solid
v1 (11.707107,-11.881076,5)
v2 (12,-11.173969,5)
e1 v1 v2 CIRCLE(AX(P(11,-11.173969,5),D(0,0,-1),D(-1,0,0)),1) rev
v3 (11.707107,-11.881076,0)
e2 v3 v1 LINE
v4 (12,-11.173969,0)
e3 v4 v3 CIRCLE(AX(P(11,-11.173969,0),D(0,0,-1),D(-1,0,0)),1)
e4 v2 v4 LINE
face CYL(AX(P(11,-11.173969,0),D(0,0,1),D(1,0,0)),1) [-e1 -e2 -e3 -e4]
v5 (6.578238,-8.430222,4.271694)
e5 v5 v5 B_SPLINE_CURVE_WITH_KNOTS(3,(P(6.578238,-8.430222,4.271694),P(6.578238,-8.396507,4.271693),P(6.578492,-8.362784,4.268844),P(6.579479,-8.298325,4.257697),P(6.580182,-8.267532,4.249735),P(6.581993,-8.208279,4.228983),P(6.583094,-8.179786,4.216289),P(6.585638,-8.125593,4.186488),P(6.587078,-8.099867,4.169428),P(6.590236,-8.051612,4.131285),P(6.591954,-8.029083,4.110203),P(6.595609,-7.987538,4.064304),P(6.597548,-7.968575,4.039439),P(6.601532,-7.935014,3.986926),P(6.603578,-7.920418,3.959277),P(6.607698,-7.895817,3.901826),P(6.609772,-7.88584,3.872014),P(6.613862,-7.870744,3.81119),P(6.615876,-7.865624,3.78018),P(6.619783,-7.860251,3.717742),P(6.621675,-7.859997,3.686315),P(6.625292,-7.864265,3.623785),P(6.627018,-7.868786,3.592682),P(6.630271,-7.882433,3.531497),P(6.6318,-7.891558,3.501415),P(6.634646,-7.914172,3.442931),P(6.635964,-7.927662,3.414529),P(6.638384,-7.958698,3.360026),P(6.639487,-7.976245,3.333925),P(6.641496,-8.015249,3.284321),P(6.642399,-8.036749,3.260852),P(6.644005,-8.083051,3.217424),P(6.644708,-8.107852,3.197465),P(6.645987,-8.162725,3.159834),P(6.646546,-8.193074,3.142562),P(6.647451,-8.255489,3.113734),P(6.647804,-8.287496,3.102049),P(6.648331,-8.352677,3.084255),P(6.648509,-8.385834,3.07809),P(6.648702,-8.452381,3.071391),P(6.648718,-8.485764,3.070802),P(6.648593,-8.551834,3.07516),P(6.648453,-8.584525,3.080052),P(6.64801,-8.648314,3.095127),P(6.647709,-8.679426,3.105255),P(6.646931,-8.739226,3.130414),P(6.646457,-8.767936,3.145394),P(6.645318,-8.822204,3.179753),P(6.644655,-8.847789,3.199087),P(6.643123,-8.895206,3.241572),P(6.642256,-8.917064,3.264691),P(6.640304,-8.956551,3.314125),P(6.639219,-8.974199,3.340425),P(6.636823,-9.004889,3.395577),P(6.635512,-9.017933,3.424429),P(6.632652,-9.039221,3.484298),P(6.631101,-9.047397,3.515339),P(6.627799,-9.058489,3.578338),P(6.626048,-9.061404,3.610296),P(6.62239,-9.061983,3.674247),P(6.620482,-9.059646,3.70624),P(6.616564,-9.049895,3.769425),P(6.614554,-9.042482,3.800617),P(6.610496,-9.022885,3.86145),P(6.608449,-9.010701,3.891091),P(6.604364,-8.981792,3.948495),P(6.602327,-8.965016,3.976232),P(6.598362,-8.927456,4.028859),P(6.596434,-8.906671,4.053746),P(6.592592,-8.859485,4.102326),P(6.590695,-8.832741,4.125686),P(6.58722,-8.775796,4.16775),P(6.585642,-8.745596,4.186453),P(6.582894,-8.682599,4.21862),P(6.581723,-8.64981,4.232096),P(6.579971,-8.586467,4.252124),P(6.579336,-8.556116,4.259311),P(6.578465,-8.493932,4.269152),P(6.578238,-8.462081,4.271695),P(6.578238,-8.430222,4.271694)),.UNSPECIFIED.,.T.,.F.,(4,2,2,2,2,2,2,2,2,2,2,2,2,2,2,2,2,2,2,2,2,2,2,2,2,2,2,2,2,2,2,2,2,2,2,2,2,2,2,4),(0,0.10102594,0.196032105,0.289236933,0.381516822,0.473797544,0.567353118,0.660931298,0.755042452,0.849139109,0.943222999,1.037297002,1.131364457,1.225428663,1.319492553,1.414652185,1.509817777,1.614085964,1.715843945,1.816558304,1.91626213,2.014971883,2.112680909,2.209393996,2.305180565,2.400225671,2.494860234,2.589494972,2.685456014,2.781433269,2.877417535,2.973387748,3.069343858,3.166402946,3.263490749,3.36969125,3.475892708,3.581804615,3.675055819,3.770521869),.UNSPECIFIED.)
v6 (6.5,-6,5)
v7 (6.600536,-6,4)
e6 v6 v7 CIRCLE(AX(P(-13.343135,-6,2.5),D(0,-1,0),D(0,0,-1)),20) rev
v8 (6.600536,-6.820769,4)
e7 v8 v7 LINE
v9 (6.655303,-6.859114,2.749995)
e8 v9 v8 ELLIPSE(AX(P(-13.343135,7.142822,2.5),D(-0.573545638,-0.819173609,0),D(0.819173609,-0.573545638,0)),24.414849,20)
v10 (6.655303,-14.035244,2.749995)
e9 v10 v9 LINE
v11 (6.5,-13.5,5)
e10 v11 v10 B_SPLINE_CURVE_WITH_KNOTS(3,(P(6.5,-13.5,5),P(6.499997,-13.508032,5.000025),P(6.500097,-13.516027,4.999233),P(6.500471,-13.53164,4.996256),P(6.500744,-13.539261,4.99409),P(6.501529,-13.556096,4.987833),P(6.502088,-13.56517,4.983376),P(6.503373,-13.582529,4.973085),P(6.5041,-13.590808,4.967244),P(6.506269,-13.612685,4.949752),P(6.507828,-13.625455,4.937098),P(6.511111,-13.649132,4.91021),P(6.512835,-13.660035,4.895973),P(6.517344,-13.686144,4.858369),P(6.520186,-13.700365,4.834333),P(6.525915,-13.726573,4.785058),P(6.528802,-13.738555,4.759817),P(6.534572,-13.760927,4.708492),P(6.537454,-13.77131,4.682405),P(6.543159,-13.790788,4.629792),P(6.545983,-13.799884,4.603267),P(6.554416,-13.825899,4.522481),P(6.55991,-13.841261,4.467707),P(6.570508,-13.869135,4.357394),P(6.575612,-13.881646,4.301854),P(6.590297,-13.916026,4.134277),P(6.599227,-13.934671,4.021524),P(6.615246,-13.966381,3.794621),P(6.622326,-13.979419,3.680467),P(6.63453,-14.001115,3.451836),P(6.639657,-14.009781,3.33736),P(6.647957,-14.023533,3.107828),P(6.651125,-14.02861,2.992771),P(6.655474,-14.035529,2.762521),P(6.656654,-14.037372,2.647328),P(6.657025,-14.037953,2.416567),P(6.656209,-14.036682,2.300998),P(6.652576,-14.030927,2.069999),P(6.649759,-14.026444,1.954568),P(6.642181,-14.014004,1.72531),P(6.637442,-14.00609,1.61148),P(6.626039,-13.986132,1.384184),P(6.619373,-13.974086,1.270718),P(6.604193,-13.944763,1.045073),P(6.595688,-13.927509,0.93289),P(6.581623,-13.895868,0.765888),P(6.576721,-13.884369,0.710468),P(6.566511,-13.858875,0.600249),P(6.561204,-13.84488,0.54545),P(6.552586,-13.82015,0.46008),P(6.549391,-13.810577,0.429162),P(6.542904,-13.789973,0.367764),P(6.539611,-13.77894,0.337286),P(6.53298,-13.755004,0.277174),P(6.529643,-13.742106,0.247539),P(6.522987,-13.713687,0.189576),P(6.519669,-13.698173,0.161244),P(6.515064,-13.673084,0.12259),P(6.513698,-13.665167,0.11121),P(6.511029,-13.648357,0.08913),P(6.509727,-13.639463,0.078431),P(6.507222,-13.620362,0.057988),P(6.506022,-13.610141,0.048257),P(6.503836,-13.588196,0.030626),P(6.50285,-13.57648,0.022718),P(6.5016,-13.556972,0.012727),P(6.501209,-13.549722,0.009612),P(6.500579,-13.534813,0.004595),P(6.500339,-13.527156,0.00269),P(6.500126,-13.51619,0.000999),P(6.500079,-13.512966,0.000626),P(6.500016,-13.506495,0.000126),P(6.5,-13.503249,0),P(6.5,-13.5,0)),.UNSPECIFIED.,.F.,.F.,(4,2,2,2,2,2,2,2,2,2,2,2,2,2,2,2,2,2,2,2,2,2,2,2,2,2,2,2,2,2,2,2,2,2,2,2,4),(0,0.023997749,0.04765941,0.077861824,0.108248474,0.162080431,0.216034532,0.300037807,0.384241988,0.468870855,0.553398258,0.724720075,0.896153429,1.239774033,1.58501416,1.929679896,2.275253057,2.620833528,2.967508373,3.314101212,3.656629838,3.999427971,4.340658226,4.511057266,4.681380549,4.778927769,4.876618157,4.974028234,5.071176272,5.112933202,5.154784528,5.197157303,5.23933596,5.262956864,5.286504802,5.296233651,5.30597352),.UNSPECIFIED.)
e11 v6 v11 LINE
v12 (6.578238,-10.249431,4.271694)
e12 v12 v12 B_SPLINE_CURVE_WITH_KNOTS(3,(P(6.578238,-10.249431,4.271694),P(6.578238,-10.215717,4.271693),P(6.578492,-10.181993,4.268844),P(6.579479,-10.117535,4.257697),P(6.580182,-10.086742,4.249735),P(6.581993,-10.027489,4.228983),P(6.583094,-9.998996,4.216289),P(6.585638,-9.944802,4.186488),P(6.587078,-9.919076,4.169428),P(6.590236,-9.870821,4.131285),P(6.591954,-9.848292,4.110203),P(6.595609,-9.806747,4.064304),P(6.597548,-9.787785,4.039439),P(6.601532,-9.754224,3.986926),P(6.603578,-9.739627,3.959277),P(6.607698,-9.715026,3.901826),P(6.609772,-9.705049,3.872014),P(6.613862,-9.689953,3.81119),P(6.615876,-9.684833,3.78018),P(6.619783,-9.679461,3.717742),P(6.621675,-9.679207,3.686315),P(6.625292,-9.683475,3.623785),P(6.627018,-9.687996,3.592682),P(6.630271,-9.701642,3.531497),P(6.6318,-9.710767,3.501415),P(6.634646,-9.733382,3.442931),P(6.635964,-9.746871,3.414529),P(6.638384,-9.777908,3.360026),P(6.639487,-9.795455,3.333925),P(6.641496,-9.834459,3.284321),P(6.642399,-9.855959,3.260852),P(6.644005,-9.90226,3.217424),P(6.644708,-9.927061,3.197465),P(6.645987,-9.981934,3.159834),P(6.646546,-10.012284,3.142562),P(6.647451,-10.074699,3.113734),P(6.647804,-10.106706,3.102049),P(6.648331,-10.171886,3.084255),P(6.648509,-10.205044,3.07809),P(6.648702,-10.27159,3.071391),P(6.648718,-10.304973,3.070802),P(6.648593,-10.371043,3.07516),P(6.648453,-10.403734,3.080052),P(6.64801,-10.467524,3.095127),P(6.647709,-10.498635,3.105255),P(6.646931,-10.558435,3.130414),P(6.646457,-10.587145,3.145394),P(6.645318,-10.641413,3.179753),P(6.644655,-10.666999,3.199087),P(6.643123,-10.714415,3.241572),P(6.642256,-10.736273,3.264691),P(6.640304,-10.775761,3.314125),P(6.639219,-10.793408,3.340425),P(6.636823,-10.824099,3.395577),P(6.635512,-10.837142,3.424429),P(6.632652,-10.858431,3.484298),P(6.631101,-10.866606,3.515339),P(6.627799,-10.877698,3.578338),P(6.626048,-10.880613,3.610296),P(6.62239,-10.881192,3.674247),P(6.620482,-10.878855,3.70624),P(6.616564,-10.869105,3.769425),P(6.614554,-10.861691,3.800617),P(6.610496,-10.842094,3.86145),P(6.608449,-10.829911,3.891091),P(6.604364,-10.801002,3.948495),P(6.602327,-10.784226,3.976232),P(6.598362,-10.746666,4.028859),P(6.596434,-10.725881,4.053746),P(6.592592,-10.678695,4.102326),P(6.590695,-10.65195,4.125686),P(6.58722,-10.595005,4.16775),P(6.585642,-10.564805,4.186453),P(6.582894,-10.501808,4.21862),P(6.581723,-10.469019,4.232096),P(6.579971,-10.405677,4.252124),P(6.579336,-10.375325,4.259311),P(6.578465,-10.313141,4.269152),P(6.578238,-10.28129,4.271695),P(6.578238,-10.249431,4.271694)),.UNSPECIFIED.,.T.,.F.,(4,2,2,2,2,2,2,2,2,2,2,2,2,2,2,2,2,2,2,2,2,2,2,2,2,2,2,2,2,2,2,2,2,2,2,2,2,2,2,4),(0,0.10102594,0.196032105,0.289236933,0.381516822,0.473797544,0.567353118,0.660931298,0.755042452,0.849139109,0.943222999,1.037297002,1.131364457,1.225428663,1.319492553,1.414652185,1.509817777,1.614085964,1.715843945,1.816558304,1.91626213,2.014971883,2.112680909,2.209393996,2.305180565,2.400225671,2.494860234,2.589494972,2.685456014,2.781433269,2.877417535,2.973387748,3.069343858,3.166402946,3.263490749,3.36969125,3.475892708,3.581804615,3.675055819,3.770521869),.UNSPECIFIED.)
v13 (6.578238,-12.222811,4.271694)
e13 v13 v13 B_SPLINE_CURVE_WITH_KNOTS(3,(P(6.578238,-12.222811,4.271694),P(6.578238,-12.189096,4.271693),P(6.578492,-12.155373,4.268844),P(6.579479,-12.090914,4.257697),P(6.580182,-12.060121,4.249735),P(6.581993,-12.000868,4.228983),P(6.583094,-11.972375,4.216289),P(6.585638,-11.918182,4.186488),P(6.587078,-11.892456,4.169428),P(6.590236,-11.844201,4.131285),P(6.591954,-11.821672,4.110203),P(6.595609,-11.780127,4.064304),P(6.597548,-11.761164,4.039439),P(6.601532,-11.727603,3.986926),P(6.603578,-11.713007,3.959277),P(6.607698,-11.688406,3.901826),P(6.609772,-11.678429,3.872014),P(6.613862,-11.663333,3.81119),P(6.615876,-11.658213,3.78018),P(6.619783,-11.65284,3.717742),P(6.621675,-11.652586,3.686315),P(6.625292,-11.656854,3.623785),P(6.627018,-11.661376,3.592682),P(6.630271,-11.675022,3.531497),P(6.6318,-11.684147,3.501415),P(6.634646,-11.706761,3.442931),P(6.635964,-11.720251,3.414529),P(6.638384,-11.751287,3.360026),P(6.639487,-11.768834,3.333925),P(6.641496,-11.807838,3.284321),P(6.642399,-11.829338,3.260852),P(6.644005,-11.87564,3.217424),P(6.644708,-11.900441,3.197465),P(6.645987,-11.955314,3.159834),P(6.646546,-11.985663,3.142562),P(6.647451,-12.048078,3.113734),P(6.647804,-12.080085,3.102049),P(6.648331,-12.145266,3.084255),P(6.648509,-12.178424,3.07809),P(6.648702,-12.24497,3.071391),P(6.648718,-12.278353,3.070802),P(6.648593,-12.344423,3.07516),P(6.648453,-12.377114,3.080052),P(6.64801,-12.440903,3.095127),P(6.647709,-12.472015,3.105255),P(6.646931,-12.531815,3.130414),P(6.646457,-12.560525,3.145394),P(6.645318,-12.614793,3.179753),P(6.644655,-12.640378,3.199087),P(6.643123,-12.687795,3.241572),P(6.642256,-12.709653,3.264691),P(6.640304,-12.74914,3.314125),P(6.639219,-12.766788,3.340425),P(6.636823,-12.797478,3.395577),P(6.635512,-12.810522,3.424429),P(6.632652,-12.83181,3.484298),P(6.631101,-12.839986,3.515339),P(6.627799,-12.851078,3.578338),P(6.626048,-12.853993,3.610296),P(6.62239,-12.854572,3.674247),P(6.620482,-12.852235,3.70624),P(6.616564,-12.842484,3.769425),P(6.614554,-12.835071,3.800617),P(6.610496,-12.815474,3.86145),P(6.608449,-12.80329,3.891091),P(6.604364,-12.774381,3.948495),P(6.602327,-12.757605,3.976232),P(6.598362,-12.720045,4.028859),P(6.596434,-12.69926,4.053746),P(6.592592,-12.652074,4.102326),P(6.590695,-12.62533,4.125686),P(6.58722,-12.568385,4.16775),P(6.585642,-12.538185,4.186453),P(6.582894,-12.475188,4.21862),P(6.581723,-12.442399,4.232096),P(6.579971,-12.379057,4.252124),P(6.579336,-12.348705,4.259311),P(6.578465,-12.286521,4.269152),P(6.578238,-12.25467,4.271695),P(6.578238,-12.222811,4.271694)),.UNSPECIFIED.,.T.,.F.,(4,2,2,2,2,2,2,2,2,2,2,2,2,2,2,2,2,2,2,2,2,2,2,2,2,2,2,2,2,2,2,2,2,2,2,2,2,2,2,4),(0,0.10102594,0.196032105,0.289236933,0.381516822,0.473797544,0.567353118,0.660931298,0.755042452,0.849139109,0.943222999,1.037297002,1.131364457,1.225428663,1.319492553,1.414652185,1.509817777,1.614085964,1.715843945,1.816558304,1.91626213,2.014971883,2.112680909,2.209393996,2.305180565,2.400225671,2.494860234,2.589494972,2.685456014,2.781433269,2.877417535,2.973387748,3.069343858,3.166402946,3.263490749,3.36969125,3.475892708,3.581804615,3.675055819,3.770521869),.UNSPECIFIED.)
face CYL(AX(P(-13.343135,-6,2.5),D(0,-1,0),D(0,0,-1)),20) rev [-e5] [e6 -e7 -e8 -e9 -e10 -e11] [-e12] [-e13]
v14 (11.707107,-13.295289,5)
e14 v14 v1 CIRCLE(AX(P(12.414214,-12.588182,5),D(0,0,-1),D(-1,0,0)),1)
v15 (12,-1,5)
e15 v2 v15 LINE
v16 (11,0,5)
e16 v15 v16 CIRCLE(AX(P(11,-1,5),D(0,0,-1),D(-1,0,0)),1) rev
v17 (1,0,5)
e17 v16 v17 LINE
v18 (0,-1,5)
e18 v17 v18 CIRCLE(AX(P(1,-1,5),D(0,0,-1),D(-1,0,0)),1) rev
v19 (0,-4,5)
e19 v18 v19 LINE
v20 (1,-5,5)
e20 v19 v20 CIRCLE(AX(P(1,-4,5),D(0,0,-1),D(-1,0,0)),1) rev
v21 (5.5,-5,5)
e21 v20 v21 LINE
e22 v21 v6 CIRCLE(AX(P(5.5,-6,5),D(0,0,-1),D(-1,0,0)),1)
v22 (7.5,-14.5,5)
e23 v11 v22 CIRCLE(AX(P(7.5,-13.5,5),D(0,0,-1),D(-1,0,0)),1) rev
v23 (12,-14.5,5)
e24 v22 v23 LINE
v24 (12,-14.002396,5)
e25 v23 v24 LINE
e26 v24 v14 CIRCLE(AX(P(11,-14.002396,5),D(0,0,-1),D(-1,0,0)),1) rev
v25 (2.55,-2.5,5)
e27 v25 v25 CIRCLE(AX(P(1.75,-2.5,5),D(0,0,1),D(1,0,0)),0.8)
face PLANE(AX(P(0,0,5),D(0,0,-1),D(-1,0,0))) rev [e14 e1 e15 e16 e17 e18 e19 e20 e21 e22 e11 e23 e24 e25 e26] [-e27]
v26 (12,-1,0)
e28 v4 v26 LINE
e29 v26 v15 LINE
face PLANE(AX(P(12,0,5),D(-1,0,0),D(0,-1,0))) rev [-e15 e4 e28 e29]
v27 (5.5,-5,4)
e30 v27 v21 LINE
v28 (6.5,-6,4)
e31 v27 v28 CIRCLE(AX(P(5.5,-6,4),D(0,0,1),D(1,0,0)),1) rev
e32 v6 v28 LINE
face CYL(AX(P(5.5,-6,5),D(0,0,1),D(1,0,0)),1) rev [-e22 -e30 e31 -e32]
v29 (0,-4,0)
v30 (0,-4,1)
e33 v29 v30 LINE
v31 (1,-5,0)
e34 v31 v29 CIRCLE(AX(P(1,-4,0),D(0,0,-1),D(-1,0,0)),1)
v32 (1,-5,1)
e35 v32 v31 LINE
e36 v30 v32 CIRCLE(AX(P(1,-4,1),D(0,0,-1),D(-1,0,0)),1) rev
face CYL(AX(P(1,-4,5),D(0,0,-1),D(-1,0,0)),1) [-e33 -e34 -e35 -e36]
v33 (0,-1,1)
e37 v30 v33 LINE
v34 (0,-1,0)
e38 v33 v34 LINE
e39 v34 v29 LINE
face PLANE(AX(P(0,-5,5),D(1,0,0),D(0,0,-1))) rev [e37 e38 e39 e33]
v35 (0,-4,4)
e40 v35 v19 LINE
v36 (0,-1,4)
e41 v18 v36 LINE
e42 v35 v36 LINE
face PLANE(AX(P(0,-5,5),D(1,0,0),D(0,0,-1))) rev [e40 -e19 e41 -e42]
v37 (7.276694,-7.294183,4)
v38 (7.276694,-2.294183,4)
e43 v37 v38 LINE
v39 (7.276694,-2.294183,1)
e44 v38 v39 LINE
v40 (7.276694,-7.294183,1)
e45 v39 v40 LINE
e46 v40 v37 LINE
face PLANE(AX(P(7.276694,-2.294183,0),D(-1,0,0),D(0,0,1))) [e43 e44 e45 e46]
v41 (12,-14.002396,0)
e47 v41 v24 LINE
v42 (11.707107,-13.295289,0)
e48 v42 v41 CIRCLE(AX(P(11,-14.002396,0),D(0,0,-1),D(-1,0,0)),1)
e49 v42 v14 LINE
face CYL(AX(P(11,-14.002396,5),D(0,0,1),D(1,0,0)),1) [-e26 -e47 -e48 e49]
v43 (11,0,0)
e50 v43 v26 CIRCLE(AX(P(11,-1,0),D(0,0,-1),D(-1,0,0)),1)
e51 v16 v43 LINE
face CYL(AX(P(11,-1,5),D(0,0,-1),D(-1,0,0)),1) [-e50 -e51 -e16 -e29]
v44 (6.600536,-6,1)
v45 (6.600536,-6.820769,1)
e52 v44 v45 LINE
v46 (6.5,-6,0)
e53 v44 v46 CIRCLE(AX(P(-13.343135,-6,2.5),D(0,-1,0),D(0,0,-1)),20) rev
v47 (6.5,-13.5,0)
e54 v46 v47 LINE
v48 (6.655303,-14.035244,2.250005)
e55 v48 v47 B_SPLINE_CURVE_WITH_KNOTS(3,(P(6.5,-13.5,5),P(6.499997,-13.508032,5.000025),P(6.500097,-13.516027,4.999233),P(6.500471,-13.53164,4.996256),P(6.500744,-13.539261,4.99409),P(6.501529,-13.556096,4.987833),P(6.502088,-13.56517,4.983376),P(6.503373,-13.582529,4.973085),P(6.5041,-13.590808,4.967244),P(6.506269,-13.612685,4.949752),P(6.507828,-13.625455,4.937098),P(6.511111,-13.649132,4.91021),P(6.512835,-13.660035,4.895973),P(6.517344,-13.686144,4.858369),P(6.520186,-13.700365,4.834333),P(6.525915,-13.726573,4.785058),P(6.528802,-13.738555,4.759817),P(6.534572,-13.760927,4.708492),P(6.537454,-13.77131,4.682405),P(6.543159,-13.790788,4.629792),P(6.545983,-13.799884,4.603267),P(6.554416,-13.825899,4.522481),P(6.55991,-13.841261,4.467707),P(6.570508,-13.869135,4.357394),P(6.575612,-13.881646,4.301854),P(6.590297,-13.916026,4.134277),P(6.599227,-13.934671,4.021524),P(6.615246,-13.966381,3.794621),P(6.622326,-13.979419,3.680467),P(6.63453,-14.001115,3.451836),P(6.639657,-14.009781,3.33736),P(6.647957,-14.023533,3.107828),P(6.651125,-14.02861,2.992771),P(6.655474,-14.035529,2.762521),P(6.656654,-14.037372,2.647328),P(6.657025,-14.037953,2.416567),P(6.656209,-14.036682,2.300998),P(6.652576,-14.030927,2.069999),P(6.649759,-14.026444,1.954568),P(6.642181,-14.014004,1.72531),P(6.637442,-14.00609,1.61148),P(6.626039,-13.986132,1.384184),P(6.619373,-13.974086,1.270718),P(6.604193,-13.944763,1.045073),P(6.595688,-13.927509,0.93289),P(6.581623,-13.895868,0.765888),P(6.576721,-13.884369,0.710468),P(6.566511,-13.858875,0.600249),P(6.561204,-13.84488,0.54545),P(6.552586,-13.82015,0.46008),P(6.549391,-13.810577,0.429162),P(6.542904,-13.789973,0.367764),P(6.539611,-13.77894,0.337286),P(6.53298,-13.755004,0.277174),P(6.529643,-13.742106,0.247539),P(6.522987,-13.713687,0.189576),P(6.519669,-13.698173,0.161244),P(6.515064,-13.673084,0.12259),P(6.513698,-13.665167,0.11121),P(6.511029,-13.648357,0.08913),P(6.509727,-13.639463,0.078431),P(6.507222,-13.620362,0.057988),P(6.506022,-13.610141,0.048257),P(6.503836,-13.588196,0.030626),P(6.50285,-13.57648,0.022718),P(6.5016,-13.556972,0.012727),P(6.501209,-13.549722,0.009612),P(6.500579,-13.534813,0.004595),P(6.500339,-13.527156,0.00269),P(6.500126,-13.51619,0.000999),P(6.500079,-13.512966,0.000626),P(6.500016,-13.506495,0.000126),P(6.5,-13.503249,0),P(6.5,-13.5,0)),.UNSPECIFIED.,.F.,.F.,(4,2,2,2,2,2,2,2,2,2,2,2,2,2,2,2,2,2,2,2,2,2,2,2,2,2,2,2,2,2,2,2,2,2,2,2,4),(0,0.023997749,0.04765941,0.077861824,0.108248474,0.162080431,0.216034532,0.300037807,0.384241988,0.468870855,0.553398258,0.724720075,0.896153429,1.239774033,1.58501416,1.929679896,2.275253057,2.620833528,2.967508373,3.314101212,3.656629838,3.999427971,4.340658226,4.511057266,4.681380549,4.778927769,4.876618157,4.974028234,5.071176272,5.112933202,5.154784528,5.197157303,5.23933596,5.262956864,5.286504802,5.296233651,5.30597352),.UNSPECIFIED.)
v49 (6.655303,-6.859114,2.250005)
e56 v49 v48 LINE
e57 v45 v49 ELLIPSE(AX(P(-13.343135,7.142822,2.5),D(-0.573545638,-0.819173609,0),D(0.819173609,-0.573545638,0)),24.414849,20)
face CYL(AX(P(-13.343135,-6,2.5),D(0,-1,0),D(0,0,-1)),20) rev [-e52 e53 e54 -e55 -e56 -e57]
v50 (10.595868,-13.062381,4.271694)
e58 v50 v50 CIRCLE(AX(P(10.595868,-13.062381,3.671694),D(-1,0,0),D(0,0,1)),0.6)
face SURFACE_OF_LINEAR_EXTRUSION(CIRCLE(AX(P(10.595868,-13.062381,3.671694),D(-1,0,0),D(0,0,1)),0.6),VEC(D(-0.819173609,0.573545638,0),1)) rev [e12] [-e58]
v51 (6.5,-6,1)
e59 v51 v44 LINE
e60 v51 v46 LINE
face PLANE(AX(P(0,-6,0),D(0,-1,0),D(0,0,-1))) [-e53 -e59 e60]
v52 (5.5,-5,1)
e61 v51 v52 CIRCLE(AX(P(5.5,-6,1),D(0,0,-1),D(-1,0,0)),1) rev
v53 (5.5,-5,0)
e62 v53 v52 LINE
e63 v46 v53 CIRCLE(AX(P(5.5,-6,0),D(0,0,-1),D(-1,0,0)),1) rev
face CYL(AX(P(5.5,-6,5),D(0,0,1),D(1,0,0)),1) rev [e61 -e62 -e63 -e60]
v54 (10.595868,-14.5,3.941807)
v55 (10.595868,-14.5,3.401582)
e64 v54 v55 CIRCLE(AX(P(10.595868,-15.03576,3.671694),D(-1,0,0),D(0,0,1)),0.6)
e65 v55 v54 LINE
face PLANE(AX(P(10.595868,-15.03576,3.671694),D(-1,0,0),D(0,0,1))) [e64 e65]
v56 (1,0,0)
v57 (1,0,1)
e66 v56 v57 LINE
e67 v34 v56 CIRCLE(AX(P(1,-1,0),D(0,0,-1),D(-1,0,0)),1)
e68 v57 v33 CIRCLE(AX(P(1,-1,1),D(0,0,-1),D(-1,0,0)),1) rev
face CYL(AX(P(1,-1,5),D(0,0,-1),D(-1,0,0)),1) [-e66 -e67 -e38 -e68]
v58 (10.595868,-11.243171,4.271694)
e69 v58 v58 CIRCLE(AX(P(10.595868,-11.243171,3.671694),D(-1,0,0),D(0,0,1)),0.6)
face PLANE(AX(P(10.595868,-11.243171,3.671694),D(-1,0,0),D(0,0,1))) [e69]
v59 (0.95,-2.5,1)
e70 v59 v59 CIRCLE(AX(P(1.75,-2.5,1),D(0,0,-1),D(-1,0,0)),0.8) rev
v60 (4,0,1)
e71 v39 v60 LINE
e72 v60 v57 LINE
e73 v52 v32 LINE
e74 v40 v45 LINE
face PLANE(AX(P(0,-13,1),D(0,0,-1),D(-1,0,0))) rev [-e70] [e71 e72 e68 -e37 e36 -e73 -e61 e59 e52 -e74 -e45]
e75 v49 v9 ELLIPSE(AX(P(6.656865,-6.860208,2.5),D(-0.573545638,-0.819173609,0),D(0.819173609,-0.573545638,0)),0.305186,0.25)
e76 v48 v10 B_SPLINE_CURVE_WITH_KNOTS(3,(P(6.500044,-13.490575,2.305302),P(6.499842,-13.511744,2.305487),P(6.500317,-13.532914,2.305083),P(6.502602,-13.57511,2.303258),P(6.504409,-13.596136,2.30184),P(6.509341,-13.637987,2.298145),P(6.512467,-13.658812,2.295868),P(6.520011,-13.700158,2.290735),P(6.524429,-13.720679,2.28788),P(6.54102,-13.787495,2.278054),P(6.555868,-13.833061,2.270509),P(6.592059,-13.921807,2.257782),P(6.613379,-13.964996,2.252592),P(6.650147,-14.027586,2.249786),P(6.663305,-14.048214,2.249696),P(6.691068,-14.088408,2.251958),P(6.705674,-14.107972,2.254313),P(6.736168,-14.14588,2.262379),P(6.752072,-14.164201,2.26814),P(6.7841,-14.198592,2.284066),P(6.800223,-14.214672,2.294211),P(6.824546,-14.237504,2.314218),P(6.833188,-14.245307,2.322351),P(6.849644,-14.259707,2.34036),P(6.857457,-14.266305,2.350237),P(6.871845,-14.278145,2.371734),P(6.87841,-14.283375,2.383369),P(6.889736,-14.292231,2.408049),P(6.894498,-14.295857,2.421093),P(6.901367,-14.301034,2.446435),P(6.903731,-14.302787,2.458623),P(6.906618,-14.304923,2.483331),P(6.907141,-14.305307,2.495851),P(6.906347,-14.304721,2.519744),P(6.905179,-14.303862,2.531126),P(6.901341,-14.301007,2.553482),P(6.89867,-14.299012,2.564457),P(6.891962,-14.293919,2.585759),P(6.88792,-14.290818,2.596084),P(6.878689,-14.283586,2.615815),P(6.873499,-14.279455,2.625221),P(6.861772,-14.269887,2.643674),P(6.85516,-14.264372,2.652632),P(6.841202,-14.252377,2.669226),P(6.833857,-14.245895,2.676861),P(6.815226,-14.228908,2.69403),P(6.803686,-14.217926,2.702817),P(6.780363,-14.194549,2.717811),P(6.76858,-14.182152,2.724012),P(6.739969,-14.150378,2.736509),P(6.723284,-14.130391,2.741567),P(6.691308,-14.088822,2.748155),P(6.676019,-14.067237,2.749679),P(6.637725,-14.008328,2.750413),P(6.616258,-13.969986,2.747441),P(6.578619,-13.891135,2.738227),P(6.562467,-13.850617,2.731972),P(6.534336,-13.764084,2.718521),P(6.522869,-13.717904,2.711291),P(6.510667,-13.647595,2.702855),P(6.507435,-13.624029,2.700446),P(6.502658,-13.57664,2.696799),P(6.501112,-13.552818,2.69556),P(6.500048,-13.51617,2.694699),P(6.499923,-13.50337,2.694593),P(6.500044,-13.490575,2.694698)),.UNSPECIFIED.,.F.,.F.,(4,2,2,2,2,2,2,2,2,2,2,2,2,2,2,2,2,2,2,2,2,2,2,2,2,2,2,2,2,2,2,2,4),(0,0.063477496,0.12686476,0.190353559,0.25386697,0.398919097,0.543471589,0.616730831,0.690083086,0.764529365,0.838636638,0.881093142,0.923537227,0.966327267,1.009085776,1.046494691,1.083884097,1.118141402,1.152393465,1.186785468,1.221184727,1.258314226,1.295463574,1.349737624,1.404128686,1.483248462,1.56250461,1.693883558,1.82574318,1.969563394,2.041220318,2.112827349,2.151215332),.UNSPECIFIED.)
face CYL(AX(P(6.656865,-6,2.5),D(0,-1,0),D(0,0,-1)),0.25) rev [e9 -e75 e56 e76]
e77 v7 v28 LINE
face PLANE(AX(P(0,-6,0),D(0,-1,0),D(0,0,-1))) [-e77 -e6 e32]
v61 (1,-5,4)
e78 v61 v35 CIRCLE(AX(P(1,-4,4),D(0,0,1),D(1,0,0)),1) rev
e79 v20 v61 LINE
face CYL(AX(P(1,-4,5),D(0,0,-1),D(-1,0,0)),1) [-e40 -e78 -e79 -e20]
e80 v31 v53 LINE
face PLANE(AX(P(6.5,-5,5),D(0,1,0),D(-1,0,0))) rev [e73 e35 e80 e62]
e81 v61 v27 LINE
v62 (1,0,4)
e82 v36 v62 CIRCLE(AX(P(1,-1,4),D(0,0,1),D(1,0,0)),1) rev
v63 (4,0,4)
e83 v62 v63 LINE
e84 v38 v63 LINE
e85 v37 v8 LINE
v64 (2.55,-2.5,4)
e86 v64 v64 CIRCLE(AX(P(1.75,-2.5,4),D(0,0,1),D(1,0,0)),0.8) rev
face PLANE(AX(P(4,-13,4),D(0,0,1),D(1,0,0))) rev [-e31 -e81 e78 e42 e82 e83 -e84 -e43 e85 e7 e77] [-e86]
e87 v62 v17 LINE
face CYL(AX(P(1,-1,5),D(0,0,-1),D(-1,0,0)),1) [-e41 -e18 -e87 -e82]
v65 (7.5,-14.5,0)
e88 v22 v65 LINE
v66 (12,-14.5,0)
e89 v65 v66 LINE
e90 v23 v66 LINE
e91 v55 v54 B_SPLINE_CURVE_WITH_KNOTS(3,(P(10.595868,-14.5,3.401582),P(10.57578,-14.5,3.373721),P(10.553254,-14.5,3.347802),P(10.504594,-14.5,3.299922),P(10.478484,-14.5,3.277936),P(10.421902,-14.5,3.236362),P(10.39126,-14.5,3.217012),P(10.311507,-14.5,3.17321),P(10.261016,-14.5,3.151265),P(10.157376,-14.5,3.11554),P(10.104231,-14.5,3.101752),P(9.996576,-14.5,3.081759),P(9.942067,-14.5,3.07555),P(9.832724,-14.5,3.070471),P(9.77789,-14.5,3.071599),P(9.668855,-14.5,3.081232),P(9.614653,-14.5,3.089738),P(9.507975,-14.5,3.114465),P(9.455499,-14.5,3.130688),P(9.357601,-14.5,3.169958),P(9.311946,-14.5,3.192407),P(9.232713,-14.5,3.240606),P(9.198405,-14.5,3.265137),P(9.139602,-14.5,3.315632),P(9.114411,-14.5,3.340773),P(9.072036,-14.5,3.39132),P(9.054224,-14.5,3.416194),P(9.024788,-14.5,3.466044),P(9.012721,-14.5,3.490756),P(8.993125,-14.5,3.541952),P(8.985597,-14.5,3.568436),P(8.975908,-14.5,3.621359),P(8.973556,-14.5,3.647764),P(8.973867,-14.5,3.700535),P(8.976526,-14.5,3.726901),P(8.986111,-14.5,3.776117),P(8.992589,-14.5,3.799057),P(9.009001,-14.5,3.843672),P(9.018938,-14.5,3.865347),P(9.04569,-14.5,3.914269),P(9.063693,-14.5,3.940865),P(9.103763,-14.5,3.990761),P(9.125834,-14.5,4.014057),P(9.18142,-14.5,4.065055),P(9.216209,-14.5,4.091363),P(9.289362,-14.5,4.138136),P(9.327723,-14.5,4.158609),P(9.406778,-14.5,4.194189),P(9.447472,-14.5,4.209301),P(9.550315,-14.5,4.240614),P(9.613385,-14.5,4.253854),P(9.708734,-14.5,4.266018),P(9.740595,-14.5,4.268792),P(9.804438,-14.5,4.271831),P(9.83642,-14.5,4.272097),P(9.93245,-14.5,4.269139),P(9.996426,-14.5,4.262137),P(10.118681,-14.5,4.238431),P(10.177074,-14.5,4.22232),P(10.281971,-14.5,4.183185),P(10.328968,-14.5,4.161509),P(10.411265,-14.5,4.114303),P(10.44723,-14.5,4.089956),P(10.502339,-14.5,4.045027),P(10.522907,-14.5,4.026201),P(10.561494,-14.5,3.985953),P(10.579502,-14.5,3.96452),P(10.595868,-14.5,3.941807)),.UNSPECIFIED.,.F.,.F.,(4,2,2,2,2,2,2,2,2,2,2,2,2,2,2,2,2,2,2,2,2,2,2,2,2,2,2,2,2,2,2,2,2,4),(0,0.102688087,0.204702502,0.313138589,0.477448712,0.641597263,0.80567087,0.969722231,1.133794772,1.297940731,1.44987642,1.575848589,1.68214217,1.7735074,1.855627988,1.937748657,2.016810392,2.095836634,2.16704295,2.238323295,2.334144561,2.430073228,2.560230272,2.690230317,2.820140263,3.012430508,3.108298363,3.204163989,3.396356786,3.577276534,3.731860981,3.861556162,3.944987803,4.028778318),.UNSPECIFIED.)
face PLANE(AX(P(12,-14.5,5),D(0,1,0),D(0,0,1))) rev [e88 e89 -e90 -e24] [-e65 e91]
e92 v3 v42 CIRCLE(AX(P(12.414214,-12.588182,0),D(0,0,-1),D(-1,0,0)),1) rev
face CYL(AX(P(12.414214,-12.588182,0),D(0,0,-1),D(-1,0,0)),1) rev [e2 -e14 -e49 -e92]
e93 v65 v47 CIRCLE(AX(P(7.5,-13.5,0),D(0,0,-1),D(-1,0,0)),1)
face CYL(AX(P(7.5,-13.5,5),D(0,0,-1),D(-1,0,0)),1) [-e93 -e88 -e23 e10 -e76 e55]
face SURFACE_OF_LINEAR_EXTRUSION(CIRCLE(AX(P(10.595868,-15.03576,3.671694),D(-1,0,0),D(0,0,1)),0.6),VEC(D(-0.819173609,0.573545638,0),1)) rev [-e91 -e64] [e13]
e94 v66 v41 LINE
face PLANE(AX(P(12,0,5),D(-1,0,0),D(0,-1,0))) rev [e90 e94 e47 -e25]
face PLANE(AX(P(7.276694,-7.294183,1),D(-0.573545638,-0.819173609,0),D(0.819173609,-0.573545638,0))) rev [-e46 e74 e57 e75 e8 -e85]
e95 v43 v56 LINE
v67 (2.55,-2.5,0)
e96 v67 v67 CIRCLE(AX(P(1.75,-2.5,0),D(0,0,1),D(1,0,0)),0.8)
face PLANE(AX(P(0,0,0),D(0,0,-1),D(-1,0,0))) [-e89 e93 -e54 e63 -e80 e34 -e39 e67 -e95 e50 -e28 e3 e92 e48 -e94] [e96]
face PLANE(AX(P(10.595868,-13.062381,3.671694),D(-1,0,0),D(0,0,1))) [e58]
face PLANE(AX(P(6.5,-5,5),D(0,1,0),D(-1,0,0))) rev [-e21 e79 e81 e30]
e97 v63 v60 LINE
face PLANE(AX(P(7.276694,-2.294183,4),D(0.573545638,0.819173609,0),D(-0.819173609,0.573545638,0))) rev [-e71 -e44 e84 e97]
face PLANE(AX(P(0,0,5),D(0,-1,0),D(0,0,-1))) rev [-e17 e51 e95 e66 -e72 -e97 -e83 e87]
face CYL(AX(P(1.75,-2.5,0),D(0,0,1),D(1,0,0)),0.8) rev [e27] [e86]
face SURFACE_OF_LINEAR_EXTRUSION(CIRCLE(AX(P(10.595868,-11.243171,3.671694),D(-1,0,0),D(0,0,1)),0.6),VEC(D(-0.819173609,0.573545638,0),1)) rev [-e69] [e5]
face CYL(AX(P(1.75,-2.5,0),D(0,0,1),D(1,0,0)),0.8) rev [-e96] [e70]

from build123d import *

# Parameters (mm, degrees)
BOSS_EXTRUDE1_DEPTH = 5
SKETCH4_R           = 0.8
CUT_EXTRUDE3_DEPTH  = 20.474342094
SKETCH5_W           = 4
SKETCH5_H           = 3
CUT_EXTRUDE4_DEPTH  = 13
FILLET4_R           = 1
CUT_EXTRUDE5_DEPTH  = 20.474342094
FILLET6_R           = 1
CUT_EXTRUDE6_START  = -8.5
CUT_EXTRUDE6_DEPTH  = 8.037702488
SKETCH11_W          = 3
SKETCH11_H          = 5
CUT_EXTRUDE8_DEPTH  = 4
SKETCH12_R          = 0.6
CUT_EXTRUDE9_DEPTH  = 5
CUT_EXTRUDE10_REACH = 21.474
SKETCH9_R           = 0.25


# Read off the part's stored shape, not the designer's step: Cut-Extrude6
with BuildPart() as part:
    # Sketch1 → Boss-Extrude1 (new body)
    with BuildSketch(Plane.XY):
        Polygon((0, 0), (12, 0), (12, -14.5), (6.5, -14.5), (6.5, -5), (0, -5), align=None)
    extrude(amount=BOSS_EXTRUDE1_DEPTH)

    # Sketch4 → Cut-Extrude3 (cut, through all)
    with BuildSketch(Plane.XY.offset(5)):
        with Locations((1.75, -2.5)):
            Circle(SKETCH4_R)
    extrude(amount=-CUT_EXTRUDE3_DEPTH, mode=Mode.SUBTRACT)

    # Sketch5 → Cut-Extrude4 (cut)
    with BuildSketch(Plane(origin=(0, 0, 0), x_dir=(1, 0, 0), z_dir=(0, 1, 0))):
        with Locations((2, -2.5)):
            Rectangle(SKETCH5_W, SKETCH5_H)
    extrude(amount=-CUT_EXTRUDE4_DEPTH, mode=Mode.SUBTRACT)

    # Fillet4
    fillet4_edges = [part.edges().sort_by_distance(p)[0] for p in [
        (0, 0, 4.5),
        (0, -5, 4.5),
        (0, 0, 0.5),
        (0, -5, 0.5),
    ]]
    fillet(fillet4_edges, radius=FILLET4_R)

    # Sketch6 → Cut-Extrude5 (cut, through all)
    with BuildSketch(Plane.XY.offset(5)):
        Polygon((12, -13.588182425), (11, -12.588182425), (12, -11.588182425), align=None)
    extrude(amount=-CUT_EXTRUDE5_DEPTH, mode=Mode.SUBTRACT)

    # Fillet6
    fillet6_edges = [part.edges().sort_by_distance(p)[0] for p in [
        (11, -12.588182425, 2.5),
        (12, -13.588182425, 2.5),
        (12, -11.588182425, 2.5),
        (6.5, -5, 2.5),
        (6.5, -14.5, 2.5),
        (12, 0, 2.5),
    ]]
    fillet(fillet6_edges, radius=FILLET6_R - 0.0001)  # a hair under: the kernel refuses the full size

    # Cut-Extrude6 outline → Cut-Extrude6 (cut)
    with BuildSketch(Plane.XZ.offset(14.5).offset(CUT_EXTRUDE6_START)):
        with BuildLine():
            Line((6.499992217, 5.000061772), (6.49999198, -6.3653e-05))
            ThreePointArc((6.49999198, -6.3653e-05), (6.656865167, 2.499999052), (6.499992217, 5.000061772))
        make_face()
    extrude(amount=CUT_EXTRUDE6_DEPTH, mode=Mode.SUBTRACT)

    # Sketch11 → Cut-Extrude8 (cut, along a direction that is not the sketch's normal)
    with BuildSketch(Plane.ZY.offset(-4)):
        with Locations((2.5, -2.5)):
            Rectangle(SKETCH11_W, SKETCH11_H)
    extrude(amount=-CUT_EXTRUDE8_DEPTH, dir=(-0.8191736087025463, 0.5735456379445732, 0), mode=Mode.SUBTRACT)

    # Sketch12 → Cut-Extrude9 (cut, along a direction that is not the sketch's normal)
    with BuildSketch(Plane.ZY.offset(-6.5)):
        with Locations((3.671694189, -8.375443102)):
            Circle(SKETCH12_R)
        with Locations((3.671694189, -10.194652501)):
            Circle(SKETCH12_R)
        with Locations((3.671694189, -12.168032187)):
            Circle(SKETCH12_R)
    extrude(amount=-CUT_EXTRUDE9_DEPTH, dir=(-0.8191736087025463, 0.5735456379445732, 0), mode=Mode.SUBTRACT)

    # Cut-Extrude10: up to this plane
    cut_extrude10_end = Plane(origin=(7.276694435, -7.294182552, 1), z_dir=(-0.5735456379445732, -0.8191736087025463, 0))
    # Sketch9 → Cut-Extrude10 (cut, up to the surface)
    with BuildSketch(Plane.XZ.offset(14.5), mode=Mode.PRIVATE) as cut_extrude10_sk1:
        with Locations((6.656865167, 2.5)):
            Circle(SKETCH9_R)
    cut_extrude10_tool1 = split(extrude(cut_extrude10_sk1.sketch, amount=-CUT_EXTRUDE10_REACH, mode=Mode.PRIVATE), bisect_by=cut_extrude10_end, keep=Keep.BOTH, mode=Mode.PRIVATE)
    add(cut_extrude10_tool1.solids().sort_by_distance((6.656865, -14.5, 2.5))[0], mode=Mode.SUBTRACT)


solid = part.part
